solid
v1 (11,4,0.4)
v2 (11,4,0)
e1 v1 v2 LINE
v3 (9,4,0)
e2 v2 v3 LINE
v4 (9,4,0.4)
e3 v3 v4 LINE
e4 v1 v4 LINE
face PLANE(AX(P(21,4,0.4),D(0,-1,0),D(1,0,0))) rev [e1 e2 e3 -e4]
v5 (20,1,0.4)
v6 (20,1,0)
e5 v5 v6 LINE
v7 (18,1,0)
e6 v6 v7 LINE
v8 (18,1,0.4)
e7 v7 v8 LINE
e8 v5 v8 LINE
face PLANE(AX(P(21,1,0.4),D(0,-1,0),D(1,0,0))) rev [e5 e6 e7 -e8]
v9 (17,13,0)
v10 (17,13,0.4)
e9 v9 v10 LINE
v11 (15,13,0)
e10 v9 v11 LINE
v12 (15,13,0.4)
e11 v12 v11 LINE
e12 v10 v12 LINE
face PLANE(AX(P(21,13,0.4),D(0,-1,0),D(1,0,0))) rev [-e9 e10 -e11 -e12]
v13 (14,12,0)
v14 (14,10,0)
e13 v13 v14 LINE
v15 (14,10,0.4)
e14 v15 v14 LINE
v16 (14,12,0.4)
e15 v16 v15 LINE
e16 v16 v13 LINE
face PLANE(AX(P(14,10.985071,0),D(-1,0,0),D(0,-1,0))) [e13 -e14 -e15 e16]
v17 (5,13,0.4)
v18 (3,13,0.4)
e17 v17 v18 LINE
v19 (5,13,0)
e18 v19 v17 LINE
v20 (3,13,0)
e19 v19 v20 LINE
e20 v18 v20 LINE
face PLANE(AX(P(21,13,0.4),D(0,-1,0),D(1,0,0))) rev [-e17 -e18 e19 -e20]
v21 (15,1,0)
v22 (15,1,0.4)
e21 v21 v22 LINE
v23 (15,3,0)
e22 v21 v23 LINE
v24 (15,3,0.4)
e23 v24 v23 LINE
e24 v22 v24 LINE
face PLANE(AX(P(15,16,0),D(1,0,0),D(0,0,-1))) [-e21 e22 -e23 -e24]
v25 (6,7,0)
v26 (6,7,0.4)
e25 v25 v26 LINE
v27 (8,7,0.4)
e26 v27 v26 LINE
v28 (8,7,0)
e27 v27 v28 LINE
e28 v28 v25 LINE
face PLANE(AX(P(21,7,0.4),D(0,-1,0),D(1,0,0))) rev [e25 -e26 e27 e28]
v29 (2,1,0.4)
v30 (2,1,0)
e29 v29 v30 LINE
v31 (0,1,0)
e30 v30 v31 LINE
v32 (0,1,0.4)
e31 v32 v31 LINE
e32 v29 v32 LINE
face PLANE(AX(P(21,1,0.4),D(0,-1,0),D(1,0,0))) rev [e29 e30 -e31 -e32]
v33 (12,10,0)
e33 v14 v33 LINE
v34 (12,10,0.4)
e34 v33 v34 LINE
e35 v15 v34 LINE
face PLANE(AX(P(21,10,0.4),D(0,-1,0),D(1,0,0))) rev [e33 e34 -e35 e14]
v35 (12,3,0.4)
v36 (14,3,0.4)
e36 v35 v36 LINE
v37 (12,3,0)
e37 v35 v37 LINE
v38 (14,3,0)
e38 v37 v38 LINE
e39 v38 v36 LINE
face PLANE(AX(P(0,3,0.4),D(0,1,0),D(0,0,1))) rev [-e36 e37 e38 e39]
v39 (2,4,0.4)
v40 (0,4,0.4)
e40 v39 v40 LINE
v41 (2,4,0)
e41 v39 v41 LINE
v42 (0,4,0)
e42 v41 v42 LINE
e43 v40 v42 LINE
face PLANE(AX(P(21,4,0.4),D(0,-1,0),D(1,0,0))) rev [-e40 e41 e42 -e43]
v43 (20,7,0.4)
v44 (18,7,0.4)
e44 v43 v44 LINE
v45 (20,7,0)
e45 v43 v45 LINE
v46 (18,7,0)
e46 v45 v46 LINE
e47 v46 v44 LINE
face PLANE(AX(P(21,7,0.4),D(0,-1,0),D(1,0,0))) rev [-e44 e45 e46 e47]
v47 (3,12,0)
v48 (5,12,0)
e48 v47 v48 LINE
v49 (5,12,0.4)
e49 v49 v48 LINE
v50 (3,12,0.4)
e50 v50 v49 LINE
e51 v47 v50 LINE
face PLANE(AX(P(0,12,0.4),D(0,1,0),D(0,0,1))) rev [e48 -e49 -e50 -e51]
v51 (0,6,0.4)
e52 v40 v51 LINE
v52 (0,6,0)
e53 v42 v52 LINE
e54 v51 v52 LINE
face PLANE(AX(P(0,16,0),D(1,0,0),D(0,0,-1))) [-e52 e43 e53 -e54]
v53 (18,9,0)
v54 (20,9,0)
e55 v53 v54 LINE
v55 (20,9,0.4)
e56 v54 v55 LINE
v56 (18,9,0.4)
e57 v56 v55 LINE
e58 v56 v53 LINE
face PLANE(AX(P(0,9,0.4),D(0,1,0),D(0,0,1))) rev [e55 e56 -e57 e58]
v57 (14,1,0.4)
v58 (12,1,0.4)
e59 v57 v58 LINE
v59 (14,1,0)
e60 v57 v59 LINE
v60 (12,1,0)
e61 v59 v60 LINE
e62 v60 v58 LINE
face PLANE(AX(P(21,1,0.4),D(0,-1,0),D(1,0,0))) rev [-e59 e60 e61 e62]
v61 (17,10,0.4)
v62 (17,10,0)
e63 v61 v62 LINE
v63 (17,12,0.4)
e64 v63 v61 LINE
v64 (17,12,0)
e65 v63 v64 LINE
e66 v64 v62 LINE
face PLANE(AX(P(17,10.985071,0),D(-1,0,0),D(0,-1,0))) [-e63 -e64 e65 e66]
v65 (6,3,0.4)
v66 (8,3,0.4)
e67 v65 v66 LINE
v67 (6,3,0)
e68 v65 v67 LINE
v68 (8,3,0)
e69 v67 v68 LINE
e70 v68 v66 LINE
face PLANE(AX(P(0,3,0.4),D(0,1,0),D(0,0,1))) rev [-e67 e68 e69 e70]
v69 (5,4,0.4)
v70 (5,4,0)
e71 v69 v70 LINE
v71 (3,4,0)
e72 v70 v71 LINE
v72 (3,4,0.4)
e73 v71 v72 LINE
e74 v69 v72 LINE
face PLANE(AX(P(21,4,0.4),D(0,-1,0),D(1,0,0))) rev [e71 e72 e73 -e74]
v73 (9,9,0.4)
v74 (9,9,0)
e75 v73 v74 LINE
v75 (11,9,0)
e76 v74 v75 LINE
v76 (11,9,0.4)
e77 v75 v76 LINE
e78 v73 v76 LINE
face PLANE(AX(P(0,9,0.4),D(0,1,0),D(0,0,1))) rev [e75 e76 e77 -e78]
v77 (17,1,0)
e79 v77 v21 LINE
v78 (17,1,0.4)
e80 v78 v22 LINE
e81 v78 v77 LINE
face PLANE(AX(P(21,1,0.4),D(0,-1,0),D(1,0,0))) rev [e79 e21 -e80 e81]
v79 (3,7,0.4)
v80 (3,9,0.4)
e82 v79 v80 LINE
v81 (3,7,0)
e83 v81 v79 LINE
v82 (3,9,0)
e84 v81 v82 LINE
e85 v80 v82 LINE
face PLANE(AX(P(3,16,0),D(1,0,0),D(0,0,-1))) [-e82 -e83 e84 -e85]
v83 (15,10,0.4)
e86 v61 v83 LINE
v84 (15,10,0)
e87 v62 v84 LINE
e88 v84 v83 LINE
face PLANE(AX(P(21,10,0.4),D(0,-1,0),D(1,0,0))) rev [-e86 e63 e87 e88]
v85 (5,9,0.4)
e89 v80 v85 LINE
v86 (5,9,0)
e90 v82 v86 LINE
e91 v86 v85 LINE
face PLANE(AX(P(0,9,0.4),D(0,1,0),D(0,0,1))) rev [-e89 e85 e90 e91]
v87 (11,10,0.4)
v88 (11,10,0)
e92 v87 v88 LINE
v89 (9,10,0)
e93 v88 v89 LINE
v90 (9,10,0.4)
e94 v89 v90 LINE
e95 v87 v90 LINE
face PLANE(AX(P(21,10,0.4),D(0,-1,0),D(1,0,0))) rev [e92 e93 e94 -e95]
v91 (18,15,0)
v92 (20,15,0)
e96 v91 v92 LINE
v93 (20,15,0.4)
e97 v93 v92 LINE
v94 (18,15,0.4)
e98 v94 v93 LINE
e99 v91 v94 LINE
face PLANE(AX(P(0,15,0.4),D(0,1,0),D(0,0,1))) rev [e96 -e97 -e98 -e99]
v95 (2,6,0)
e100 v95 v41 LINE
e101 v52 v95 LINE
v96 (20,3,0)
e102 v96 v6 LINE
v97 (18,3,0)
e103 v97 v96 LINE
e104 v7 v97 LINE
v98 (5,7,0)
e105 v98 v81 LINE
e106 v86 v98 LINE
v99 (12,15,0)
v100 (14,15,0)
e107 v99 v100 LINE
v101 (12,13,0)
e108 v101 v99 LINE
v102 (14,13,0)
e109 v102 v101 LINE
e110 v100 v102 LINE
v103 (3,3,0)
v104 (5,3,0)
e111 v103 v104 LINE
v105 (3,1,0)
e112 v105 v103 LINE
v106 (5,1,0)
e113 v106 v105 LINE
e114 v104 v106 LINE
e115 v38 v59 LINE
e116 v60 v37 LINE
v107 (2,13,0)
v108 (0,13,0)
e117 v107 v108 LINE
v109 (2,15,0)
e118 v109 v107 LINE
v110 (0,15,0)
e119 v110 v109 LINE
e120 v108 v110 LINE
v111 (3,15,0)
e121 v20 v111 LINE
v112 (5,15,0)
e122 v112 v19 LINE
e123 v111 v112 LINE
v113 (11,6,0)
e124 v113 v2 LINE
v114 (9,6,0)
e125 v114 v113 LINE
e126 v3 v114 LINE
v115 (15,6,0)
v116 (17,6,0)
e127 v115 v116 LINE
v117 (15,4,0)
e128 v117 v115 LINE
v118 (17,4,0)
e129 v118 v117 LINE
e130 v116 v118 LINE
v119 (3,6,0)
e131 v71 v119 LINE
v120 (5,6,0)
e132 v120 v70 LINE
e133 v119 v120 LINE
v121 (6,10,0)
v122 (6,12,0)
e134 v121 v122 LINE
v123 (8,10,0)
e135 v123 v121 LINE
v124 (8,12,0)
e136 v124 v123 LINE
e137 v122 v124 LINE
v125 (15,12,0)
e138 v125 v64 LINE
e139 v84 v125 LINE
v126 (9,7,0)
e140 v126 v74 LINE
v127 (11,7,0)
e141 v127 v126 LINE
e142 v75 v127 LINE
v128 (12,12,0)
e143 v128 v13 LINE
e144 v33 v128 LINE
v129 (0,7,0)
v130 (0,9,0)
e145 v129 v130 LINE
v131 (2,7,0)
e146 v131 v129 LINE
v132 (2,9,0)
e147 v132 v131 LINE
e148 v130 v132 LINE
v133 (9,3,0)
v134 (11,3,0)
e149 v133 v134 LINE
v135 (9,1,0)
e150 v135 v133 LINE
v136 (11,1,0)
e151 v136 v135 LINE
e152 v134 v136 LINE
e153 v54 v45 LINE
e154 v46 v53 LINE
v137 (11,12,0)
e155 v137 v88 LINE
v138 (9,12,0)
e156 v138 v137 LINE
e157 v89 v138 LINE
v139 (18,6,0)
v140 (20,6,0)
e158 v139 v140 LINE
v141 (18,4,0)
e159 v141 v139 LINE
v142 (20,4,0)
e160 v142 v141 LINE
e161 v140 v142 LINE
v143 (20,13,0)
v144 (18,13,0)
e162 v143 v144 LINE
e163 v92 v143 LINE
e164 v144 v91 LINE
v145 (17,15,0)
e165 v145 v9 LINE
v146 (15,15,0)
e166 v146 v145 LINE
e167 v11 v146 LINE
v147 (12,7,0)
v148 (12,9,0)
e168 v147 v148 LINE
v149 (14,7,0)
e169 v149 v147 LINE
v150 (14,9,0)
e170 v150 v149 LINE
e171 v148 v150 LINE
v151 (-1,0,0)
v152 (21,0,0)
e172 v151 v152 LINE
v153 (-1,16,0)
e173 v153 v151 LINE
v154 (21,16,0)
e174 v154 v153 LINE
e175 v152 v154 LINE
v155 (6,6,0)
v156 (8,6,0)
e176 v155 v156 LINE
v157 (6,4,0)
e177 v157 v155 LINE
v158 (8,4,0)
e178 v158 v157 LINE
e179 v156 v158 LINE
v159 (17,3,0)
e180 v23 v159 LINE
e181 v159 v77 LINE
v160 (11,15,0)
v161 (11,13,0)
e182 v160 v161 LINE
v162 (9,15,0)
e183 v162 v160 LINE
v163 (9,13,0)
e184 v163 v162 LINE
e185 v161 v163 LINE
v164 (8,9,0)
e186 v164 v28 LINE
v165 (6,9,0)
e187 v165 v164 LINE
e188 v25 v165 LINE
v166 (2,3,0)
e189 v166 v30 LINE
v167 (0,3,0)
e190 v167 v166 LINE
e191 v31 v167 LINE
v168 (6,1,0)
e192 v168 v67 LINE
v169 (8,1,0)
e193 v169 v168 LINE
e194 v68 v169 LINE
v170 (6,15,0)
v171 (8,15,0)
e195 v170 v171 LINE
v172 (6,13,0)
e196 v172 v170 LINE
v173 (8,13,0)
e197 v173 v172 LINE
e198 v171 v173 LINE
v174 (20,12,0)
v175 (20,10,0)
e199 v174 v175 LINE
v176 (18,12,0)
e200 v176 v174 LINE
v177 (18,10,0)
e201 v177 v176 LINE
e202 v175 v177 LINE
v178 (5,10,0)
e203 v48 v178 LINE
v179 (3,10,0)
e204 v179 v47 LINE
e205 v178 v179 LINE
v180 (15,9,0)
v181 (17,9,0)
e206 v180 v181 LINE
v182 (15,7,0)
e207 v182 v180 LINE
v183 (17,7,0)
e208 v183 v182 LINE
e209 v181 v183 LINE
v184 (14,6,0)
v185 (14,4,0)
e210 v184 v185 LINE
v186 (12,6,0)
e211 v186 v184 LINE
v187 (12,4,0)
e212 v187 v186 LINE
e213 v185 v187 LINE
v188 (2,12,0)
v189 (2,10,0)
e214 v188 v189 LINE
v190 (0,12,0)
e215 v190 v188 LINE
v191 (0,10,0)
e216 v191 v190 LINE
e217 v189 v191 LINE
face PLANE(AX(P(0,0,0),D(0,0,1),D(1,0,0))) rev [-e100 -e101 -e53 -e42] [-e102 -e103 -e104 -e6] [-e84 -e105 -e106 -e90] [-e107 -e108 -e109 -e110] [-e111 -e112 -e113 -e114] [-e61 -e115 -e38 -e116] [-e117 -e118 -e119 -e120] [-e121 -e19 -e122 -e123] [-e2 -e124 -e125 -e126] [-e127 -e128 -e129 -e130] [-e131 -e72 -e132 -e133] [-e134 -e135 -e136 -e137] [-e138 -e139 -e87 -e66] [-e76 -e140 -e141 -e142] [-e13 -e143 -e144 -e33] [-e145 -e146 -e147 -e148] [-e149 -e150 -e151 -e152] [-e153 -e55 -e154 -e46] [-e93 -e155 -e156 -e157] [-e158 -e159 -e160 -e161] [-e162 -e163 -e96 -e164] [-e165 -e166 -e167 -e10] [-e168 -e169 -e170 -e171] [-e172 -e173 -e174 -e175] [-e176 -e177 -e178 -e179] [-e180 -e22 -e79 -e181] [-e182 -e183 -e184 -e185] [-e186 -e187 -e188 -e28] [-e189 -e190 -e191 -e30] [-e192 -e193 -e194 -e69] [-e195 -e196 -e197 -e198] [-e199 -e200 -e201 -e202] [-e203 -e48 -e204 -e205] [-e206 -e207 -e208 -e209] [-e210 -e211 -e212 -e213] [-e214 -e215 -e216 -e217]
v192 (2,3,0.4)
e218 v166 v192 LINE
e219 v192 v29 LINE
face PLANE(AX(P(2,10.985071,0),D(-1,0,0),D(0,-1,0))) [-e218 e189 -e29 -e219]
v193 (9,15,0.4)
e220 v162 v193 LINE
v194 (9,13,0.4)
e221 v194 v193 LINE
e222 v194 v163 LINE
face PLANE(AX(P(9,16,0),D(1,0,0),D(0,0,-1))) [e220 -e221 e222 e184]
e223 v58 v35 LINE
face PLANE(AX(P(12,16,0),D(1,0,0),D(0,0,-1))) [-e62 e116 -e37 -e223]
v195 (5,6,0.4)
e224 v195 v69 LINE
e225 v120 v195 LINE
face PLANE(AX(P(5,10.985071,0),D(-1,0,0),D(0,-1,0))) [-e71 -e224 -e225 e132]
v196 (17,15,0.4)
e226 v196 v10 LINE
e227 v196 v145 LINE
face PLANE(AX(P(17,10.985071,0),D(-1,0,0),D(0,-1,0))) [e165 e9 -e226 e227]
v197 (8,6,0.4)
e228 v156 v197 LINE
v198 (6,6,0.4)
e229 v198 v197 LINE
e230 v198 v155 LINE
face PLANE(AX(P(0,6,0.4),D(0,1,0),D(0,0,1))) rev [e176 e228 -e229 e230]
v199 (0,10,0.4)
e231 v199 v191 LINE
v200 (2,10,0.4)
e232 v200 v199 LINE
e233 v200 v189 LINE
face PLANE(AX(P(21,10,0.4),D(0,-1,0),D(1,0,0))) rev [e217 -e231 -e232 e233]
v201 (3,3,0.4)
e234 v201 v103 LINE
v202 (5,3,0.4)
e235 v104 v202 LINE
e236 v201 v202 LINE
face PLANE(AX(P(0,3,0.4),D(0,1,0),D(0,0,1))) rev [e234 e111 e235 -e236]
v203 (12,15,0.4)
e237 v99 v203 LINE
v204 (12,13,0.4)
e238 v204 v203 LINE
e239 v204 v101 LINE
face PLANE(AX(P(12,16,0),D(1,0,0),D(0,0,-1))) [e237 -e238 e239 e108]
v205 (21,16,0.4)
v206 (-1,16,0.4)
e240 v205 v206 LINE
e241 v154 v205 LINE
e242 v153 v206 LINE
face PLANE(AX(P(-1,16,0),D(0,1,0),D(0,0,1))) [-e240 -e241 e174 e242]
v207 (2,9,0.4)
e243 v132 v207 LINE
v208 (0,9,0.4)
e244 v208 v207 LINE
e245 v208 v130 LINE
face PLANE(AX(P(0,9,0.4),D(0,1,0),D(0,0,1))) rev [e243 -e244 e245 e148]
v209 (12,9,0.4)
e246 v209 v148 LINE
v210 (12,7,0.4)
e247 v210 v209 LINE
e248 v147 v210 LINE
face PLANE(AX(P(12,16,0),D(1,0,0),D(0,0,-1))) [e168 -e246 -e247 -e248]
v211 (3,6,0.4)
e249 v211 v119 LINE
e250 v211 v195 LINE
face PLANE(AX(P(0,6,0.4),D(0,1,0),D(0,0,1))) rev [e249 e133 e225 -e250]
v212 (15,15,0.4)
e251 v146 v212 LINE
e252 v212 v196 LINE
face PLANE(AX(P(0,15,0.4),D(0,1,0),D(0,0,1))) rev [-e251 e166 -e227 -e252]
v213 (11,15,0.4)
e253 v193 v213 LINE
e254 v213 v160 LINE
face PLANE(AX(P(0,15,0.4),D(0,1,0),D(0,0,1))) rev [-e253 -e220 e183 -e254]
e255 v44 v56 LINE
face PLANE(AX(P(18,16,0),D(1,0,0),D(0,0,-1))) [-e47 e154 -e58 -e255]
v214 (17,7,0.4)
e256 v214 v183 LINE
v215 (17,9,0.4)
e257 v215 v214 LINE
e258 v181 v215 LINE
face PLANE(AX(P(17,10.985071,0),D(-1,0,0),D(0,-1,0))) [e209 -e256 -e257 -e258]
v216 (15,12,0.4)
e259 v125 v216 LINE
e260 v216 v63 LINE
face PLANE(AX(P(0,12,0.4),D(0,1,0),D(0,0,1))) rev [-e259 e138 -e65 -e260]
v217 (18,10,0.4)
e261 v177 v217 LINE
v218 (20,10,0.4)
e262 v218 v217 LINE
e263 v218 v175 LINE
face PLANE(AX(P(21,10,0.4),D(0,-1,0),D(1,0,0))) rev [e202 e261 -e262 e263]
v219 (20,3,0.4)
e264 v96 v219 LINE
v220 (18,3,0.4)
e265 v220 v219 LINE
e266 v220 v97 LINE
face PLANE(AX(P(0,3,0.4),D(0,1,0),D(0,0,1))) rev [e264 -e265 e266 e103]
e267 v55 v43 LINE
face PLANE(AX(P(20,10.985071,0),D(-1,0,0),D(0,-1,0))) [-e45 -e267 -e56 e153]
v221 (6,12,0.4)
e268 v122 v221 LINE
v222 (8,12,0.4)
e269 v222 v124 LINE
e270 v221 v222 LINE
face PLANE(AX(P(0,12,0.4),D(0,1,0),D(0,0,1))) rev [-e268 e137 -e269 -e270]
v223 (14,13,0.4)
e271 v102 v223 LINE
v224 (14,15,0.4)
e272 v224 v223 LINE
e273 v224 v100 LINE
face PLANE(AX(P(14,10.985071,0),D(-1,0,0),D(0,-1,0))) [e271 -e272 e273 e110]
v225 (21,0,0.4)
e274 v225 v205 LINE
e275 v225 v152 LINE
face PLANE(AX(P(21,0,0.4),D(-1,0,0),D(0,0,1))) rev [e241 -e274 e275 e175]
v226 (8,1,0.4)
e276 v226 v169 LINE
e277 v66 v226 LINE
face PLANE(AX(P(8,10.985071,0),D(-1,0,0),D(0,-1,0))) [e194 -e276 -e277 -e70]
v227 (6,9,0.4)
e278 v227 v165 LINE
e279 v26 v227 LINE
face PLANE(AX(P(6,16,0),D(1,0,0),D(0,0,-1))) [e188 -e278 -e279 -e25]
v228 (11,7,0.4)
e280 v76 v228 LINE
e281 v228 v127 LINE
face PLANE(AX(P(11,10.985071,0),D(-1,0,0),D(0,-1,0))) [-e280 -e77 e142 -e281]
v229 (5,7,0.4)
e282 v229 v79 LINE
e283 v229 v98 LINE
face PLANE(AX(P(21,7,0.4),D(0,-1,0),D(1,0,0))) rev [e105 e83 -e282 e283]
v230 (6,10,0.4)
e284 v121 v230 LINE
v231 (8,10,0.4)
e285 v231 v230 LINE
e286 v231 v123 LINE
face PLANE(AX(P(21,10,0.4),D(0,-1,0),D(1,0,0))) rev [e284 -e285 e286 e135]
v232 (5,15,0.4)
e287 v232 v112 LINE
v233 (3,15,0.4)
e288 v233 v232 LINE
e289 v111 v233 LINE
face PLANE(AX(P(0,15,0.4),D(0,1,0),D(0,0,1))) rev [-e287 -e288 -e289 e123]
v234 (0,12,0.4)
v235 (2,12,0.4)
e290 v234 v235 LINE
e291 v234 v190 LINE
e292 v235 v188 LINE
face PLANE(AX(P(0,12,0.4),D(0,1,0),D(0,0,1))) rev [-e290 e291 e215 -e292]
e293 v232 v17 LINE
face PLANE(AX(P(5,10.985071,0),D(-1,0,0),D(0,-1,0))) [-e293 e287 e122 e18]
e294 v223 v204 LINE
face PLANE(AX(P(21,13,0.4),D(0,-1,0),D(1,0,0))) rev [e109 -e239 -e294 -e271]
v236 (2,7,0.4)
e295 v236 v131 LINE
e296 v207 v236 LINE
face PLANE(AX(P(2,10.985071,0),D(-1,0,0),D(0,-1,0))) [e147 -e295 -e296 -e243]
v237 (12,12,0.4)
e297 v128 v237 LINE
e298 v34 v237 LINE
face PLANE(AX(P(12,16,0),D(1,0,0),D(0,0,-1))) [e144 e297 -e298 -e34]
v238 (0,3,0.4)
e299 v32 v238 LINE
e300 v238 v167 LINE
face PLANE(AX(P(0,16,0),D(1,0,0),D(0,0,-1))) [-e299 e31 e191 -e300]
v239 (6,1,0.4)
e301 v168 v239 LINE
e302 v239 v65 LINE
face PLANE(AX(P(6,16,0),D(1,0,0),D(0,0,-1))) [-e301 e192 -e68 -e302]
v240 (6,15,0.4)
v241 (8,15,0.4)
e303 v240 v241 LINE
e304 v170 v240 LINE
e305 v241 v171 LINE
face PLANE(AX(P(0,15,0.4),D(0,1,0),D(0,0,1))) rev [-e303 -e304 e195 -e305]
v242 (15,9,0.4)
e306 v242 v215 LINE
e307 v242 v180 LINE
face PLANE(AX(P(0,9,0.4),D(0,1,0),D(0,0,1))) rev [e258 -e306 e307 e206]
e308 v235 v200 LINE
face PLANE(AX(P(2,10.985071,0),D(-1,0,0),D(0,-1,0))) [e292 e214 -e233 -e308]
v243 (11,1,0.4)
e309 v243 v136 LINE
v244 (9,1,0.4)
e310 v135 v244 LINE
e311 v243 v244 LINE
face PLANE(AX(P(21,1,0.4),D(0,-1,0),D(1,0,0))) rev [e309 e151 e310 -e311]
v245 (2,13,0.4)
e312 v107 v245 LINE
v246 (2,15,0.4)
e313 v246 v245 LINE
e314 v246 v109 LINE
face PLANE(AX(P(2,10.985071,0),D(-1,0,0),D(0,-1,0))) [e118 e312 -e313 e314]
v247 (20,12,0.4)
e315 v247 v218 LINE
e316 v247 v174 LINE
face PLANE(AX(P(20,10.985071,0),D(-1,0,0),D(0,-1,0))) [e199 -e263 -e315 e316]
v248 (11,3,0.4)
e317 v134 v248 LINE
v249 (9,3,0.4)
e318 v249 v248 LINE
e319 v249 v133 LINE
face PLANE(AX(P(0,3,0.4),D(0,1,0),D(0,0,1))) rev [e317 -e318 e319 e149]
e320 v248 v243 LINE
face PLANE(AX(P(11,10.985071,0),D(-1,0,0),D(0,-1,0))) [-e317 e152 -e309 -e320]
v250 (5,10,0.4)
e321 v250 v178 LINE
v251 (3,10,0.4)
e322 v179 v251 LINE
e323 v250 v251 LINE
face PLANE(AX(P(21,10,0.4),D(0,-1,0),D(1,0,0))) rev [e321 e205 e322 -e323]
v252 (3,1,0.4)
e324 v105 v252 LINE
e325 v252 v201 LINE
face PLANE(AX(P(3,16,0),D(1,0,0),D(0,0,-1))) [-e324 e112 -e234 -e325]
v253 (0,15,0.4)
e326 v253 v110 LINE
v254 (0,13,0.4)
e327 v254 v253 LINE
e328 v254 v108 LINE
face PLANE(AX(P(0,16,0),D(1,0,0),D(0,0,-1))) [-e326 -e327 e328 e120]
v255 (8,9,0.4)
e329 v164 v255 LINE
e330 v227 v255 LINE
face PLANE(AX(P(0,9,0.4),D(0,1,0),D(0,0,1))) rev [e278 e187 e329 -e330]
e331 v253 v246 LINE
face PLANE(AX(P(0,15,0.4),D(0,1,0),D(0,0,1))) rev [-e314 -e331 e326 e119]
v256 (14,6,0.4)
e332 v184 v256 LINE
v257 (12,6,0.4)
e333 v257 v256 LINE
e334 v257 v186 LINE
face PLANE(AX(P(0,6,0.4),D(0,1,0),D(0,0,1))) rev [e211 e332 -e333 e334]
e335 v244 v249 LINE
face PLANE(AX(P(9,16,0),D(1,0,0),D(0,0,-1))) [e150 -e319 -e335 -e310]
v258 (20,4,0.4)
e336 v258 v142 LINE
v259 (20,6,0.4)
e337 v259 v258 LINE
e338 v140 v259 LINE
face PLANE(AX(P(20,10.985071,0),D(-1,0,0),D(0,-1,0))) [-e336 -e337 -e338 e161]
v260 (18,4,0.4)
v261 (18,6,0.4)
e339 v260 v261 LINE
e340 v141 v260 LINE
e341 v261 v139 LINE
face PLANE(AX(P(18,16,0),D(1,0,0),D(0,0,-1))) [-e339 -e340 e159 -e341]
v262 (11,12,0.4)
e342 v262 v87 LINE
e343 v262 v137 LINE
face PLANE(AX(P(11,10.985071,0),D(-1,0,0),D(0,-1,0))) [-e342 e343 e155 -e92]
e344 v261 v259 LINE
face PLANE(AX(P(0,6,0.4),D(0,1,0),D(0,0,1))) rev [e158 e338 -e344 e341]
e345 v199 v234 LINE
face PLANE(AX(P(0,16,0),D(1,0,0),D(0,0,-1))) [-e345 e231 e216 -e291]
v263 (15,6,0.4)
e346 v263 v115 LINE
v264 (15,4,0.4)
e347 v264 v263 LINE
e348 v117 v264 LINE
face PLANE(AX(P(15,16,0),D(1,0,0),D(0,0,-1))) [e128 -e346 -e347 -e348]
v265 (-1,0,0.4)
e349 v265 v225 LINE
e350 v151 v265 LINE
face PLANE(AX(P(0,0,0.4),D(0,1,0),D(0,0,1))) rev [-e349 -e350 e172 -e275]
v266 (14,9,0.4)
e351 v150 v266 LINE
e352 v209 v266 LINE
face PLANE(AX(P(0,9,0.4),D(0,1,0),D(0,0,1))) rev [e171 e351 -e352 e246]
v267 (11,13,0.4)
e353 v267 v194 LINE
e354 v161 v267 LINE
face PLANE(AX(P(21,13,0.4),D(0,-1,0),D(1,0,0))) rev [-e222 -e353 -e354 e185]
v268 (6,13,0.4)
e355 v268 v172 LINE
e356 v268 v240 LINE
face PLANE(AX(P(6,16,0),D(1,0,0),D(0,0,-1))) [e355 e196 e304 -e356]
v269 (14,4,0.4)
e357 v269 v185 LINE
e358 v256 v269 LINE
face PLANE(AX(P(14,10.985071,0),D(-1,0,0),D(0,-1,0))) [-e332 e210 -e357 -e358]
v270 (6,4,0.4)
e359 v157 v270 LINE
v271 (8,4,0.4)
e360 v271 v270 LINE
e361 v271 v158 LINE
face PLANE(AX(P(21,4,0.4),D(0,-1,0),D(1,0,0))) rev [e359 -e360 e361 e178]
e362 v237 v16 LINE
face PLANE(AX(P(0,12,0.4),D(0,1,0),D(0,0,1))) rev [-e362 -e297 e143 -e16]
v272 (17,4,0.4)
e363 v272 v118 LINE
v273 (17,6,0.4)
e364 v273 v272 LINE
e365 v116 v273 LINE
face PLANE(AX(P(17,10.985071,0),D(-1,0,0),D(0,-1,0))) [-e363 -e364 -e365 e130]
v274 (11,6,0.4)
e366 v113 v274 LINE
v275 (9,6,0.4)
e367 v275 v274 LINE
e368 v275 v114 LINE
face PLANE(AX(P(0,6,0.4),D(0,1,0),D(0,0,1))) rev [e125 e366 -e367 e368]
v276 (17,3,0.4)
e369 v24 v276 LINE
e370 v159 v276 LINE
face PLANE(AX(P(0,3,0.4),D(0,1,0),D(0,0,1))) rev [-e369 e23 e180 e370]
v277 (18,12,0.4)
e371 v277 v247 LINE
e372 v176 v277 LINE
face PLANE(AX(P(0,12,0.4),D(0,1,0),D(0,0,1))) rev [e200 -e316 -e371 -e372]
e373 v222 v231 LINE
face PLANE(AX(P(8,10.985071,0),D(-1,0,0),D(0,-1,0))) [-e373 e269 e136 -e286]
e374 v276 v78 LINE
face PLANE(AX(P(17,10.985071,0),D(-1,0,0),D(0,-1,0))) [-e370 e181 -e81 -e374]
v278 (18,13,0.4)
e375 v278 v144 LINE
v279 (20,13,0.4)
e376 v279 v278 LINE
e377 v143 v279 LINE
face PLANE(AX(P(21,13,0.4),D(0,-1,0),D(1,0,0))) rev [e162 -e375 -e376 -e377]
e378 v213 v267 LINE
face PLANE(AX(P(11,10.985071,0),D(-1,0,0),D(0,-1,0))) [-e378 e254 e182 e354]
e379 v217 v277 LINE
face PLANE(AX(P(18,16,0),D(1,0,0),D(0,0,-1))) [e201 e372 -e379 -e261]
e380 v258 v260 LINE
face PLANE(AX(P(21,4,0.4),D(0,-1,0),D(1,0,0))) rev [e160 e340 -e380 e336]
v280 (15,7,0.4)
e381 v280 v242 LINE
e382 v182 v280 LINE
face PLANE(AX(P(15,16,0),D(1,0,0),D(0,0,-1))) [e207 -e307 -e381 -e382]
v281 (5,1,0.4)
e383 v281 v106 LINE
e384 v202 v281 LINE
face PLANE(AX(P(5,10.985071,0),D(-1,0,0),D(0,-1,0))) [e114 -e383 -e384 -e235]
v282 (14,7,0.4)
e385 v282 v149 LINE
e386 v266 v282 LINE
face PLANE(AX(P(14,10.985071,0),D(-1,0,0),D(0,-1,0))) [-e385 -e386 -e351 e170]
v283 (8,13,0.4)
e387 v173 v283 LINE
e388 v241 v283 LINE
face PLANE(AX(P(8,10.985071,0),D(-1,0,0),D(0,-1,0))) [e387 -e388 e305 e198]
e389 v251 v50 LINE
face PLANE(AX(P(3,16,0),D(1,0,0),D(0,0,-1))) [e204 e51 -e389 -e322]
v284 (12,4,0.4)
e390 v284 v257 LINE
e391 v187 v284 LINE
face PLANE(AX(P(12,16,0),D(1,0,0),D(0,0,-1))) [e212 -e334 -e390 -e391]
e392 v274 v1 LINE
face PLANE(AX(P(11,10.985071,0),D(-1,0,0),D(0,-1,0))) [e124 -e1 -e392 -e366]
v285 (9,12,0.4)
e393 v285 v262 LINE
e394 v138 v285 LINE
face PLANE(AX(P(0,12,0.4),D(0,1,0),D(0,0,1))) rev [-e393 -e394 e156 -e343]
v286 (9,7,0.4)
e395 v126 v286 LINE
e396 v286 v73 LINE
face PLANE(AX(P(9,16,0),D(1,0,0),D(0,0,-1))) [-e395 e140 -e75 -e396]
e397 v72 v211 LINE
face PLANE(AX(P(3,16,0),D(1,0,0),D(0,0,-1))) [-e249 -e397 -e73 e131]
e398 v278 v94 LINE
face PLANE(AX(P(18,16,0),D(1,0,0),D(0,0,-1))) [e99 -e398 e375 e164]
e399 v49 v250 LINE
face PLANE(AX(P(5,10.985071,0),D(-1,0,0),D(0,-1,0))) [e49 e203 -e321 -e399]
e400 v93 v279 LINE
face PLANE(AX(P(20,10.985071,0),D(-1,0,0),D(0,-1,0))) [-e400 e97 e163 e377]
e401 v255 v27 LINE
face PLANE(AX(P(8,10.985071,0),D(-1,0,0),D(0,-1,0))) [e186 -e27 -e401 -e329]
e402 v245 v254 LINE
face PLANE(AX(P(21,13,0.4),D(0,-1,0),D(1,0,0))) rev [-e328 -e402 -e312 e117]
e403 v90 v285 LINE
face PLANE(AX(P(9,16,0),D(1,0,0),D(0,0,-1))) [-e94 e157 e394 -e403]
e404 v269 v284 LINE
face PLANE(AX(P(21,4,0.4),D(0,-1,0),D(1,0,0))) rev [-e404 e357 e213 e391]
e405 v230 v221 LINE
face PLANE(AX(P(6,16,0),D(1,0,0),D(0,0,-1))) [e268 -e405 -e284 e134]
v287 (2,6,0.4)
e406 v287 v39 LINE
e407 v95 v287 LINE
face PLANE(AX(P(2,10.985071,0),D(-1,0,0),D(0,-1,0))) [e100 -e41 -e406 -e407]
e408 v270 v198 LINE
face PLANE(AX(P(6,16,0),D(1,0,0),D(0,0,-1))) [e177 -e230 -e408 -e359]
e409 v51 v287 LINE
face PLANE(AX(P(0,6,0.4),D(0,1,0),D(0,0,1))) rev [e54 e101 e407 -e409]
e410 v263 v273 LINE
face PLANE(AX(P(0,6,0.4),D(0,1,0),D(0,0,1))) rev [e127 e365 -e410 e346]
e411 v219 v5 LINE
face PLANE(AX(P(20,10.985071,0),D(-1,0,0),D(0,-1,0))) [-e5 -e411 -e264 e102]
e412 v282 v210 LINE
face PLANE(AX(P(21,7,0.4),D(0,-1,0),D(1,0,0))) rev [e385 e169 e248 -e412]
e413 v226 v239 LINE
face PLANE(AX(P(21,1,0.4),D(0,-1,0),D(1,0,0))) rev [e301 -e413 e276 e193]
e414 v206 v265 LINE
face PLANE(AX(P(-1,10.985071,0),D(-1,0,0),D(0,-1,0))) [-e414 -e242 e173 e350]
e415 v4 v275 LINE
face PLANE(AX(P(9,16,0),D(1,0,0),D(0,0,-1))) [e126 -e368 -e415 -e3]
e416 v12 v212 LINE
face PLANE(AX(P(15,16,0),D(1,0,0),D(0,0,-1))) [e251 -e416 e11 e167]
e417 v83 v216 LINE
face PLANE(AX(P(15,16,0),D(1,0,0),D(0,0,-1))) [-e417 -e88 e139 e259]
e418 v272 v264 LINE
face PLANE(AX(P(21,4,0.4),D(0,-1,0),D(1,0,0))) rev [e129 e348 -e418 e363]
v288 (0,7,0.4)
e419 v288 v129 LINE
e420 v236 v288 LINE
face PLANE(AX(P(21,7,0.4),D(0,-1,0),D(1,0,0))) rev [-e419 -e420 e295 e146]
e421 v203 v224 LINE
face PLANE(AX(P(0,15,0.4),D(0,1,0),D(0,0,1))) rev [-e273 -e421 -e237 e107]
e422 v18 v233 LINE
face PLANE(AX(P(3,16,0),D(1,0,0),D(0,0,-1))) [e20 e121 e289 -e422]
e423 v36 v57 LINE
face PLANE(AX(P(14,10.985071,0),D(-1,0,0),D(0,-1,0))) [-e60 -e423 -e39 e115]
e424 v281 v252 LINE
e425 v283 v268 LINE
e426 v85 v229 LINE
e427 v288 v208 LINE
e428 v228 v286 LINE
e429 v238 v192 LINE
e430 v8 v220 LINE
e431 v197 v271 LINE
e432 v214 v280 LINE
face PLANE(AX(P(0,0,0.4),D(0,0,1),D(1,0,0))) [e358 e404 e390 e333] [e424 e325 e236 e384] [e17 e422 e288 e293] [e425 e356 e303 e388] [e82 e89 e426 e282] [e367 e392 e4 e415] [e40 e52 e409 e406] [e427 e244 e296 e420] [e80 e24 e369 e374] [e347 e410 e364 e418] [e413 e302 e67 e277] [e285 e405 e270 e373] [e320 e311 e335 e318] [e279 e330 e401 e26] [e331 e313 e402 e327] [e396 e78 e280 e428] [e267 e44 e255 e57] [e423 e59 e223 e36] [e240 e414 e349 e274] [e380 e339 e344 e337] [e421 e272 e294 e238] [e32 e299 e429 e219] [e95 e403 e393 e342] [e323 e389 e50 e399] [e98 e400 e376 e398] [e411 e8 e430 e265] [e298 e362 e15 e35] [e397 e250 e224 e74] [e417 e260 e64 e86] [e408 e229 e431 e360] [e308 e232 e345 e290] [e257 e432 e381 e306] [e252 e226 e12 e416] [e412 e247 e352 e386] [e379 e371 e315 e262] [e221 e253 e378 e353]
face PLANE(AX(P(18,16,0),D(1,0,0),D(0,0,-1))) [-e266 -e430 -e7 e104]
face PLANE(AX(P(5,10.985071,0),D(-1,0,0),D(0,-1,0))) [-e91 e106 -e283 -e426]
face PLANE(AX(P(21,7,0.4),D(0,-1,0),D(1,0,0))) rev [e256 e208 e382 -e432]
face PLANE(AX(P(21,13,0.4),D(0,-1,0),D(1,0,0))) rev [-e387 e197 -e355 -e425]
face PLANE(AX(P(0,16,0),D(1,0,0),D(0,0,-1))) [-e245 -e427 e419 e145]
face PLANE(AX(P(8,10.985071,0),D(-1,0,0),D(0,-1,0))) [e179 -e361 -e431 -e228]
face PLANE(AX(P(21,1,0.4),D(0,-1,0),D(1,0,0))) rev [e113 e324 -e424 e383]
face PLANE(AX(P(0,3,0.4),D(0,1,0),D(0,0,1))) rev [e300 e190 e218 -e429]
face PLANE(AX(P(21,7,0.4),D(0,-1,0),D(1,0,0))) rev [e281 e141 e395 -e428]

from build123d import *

# Parameters (mm, degrees)
SKETCH_1_W             = 21
SKETCH_1_H             = 1
EXTRUDE_1_DEPTH        = 0.4
PATTERN_LINEAR_1_COUNT = 6
PATTERN_LINEAR_1_PITCH = 3
EXTRUDE_3_DEPTH        = 0.4
PATTERN_LINEAR_2_COUNT = 8
PATTERN_LINEAR_2_PITCH = 3


with BuildPart() as part:
    # 草图1 → 凸台-拉伸1 (new body)
    with BuildSketch(Plane.XY):
        with Locations((10.5, 0.5)):
            Rectangle(SKETCH_1_W, SKETCH_1_H)
    extrude(amount=EXTRUDE_1_DEPTH)


with BuildPart() as pattern_linear_1_1:
    # 阵列(线性)1: pattern copy
    add(part.part.moved(Location(Vector(0, 1, 0) * (1 * PATTERN_LINEAR_1_PITCH))))


with BuildPart() as pattern_linear_1_2:
    # 阵列(线性)1: pattern copy
    add(part.part.moved(Location(Vector(0, 1, 0) * (2 * PATTERN_LINEAR_1_PITCH))))


with BuildPart() as pattern_linear_1_3:
    # 阵列(线性)1: pattern copy
    add(part.part.moved(Location(Vector(0, 1, 0) * (3 * PATTERN_LINEAR_1_PITCH))))


with BuildPart() as pattern_linear_1_4:
    # 阵列(线性)1: pattern copy
    add(part.part.moved(Location(Vector(0, 1, 0) * (4 * PATTERN_LINEAR_1_PITCH))))


with BuildPart() as pattern_linear_1_5:
    # 阵列(线性)1: pattern copy
    add(part.part.moved(Location(Vector(0, 1, 0) * (5 * PATTERN_LINEAR_1_PITCH))))


with BuildPart() as part_1:
    add(part.part)

    add(pattern_linear_1_1.part)  # 凸台-拉伸3 merges 阵列(线性)1_1

    add(pattern_linear_1_2.part)  # 凸台-拉伸3 merges 阵列(线性)1_2

    add(pattern_linear_1_3.part)  # 凸台-拉伸3 merges 阵列(线性)1_3
    # 草图3 → 凸台-拉伸3 (add)
    with BuildSketch(Plane.XY.offset(0.4)):
        Polygon((0, 16), (0, 10), (0, 0), (-1, 0), (-1, 10.98507125), (-1, 16), align=None)
    extrude_3 = extrude(amount=-EXTRUDE_3_DEPTH)

    # 阵列(线性)2: 凸台-拉伸3 ×8
    with Locations(*[(i * PATTERN_LINEAR_2_PITCH, 0, 0) for i in range(1, PATTERN_LINEAR_2_COUNT)]):
        add(extrude_3)

    # Combine 1: read off the stored shape, not the designer's step
    # Combine 1: union 阵列(线性)1_4, 阵列(线性)1_5
    add(pattern_linear_1_4.part)
    add(pattern_linear_1_5.part)


solid = part_1.part
